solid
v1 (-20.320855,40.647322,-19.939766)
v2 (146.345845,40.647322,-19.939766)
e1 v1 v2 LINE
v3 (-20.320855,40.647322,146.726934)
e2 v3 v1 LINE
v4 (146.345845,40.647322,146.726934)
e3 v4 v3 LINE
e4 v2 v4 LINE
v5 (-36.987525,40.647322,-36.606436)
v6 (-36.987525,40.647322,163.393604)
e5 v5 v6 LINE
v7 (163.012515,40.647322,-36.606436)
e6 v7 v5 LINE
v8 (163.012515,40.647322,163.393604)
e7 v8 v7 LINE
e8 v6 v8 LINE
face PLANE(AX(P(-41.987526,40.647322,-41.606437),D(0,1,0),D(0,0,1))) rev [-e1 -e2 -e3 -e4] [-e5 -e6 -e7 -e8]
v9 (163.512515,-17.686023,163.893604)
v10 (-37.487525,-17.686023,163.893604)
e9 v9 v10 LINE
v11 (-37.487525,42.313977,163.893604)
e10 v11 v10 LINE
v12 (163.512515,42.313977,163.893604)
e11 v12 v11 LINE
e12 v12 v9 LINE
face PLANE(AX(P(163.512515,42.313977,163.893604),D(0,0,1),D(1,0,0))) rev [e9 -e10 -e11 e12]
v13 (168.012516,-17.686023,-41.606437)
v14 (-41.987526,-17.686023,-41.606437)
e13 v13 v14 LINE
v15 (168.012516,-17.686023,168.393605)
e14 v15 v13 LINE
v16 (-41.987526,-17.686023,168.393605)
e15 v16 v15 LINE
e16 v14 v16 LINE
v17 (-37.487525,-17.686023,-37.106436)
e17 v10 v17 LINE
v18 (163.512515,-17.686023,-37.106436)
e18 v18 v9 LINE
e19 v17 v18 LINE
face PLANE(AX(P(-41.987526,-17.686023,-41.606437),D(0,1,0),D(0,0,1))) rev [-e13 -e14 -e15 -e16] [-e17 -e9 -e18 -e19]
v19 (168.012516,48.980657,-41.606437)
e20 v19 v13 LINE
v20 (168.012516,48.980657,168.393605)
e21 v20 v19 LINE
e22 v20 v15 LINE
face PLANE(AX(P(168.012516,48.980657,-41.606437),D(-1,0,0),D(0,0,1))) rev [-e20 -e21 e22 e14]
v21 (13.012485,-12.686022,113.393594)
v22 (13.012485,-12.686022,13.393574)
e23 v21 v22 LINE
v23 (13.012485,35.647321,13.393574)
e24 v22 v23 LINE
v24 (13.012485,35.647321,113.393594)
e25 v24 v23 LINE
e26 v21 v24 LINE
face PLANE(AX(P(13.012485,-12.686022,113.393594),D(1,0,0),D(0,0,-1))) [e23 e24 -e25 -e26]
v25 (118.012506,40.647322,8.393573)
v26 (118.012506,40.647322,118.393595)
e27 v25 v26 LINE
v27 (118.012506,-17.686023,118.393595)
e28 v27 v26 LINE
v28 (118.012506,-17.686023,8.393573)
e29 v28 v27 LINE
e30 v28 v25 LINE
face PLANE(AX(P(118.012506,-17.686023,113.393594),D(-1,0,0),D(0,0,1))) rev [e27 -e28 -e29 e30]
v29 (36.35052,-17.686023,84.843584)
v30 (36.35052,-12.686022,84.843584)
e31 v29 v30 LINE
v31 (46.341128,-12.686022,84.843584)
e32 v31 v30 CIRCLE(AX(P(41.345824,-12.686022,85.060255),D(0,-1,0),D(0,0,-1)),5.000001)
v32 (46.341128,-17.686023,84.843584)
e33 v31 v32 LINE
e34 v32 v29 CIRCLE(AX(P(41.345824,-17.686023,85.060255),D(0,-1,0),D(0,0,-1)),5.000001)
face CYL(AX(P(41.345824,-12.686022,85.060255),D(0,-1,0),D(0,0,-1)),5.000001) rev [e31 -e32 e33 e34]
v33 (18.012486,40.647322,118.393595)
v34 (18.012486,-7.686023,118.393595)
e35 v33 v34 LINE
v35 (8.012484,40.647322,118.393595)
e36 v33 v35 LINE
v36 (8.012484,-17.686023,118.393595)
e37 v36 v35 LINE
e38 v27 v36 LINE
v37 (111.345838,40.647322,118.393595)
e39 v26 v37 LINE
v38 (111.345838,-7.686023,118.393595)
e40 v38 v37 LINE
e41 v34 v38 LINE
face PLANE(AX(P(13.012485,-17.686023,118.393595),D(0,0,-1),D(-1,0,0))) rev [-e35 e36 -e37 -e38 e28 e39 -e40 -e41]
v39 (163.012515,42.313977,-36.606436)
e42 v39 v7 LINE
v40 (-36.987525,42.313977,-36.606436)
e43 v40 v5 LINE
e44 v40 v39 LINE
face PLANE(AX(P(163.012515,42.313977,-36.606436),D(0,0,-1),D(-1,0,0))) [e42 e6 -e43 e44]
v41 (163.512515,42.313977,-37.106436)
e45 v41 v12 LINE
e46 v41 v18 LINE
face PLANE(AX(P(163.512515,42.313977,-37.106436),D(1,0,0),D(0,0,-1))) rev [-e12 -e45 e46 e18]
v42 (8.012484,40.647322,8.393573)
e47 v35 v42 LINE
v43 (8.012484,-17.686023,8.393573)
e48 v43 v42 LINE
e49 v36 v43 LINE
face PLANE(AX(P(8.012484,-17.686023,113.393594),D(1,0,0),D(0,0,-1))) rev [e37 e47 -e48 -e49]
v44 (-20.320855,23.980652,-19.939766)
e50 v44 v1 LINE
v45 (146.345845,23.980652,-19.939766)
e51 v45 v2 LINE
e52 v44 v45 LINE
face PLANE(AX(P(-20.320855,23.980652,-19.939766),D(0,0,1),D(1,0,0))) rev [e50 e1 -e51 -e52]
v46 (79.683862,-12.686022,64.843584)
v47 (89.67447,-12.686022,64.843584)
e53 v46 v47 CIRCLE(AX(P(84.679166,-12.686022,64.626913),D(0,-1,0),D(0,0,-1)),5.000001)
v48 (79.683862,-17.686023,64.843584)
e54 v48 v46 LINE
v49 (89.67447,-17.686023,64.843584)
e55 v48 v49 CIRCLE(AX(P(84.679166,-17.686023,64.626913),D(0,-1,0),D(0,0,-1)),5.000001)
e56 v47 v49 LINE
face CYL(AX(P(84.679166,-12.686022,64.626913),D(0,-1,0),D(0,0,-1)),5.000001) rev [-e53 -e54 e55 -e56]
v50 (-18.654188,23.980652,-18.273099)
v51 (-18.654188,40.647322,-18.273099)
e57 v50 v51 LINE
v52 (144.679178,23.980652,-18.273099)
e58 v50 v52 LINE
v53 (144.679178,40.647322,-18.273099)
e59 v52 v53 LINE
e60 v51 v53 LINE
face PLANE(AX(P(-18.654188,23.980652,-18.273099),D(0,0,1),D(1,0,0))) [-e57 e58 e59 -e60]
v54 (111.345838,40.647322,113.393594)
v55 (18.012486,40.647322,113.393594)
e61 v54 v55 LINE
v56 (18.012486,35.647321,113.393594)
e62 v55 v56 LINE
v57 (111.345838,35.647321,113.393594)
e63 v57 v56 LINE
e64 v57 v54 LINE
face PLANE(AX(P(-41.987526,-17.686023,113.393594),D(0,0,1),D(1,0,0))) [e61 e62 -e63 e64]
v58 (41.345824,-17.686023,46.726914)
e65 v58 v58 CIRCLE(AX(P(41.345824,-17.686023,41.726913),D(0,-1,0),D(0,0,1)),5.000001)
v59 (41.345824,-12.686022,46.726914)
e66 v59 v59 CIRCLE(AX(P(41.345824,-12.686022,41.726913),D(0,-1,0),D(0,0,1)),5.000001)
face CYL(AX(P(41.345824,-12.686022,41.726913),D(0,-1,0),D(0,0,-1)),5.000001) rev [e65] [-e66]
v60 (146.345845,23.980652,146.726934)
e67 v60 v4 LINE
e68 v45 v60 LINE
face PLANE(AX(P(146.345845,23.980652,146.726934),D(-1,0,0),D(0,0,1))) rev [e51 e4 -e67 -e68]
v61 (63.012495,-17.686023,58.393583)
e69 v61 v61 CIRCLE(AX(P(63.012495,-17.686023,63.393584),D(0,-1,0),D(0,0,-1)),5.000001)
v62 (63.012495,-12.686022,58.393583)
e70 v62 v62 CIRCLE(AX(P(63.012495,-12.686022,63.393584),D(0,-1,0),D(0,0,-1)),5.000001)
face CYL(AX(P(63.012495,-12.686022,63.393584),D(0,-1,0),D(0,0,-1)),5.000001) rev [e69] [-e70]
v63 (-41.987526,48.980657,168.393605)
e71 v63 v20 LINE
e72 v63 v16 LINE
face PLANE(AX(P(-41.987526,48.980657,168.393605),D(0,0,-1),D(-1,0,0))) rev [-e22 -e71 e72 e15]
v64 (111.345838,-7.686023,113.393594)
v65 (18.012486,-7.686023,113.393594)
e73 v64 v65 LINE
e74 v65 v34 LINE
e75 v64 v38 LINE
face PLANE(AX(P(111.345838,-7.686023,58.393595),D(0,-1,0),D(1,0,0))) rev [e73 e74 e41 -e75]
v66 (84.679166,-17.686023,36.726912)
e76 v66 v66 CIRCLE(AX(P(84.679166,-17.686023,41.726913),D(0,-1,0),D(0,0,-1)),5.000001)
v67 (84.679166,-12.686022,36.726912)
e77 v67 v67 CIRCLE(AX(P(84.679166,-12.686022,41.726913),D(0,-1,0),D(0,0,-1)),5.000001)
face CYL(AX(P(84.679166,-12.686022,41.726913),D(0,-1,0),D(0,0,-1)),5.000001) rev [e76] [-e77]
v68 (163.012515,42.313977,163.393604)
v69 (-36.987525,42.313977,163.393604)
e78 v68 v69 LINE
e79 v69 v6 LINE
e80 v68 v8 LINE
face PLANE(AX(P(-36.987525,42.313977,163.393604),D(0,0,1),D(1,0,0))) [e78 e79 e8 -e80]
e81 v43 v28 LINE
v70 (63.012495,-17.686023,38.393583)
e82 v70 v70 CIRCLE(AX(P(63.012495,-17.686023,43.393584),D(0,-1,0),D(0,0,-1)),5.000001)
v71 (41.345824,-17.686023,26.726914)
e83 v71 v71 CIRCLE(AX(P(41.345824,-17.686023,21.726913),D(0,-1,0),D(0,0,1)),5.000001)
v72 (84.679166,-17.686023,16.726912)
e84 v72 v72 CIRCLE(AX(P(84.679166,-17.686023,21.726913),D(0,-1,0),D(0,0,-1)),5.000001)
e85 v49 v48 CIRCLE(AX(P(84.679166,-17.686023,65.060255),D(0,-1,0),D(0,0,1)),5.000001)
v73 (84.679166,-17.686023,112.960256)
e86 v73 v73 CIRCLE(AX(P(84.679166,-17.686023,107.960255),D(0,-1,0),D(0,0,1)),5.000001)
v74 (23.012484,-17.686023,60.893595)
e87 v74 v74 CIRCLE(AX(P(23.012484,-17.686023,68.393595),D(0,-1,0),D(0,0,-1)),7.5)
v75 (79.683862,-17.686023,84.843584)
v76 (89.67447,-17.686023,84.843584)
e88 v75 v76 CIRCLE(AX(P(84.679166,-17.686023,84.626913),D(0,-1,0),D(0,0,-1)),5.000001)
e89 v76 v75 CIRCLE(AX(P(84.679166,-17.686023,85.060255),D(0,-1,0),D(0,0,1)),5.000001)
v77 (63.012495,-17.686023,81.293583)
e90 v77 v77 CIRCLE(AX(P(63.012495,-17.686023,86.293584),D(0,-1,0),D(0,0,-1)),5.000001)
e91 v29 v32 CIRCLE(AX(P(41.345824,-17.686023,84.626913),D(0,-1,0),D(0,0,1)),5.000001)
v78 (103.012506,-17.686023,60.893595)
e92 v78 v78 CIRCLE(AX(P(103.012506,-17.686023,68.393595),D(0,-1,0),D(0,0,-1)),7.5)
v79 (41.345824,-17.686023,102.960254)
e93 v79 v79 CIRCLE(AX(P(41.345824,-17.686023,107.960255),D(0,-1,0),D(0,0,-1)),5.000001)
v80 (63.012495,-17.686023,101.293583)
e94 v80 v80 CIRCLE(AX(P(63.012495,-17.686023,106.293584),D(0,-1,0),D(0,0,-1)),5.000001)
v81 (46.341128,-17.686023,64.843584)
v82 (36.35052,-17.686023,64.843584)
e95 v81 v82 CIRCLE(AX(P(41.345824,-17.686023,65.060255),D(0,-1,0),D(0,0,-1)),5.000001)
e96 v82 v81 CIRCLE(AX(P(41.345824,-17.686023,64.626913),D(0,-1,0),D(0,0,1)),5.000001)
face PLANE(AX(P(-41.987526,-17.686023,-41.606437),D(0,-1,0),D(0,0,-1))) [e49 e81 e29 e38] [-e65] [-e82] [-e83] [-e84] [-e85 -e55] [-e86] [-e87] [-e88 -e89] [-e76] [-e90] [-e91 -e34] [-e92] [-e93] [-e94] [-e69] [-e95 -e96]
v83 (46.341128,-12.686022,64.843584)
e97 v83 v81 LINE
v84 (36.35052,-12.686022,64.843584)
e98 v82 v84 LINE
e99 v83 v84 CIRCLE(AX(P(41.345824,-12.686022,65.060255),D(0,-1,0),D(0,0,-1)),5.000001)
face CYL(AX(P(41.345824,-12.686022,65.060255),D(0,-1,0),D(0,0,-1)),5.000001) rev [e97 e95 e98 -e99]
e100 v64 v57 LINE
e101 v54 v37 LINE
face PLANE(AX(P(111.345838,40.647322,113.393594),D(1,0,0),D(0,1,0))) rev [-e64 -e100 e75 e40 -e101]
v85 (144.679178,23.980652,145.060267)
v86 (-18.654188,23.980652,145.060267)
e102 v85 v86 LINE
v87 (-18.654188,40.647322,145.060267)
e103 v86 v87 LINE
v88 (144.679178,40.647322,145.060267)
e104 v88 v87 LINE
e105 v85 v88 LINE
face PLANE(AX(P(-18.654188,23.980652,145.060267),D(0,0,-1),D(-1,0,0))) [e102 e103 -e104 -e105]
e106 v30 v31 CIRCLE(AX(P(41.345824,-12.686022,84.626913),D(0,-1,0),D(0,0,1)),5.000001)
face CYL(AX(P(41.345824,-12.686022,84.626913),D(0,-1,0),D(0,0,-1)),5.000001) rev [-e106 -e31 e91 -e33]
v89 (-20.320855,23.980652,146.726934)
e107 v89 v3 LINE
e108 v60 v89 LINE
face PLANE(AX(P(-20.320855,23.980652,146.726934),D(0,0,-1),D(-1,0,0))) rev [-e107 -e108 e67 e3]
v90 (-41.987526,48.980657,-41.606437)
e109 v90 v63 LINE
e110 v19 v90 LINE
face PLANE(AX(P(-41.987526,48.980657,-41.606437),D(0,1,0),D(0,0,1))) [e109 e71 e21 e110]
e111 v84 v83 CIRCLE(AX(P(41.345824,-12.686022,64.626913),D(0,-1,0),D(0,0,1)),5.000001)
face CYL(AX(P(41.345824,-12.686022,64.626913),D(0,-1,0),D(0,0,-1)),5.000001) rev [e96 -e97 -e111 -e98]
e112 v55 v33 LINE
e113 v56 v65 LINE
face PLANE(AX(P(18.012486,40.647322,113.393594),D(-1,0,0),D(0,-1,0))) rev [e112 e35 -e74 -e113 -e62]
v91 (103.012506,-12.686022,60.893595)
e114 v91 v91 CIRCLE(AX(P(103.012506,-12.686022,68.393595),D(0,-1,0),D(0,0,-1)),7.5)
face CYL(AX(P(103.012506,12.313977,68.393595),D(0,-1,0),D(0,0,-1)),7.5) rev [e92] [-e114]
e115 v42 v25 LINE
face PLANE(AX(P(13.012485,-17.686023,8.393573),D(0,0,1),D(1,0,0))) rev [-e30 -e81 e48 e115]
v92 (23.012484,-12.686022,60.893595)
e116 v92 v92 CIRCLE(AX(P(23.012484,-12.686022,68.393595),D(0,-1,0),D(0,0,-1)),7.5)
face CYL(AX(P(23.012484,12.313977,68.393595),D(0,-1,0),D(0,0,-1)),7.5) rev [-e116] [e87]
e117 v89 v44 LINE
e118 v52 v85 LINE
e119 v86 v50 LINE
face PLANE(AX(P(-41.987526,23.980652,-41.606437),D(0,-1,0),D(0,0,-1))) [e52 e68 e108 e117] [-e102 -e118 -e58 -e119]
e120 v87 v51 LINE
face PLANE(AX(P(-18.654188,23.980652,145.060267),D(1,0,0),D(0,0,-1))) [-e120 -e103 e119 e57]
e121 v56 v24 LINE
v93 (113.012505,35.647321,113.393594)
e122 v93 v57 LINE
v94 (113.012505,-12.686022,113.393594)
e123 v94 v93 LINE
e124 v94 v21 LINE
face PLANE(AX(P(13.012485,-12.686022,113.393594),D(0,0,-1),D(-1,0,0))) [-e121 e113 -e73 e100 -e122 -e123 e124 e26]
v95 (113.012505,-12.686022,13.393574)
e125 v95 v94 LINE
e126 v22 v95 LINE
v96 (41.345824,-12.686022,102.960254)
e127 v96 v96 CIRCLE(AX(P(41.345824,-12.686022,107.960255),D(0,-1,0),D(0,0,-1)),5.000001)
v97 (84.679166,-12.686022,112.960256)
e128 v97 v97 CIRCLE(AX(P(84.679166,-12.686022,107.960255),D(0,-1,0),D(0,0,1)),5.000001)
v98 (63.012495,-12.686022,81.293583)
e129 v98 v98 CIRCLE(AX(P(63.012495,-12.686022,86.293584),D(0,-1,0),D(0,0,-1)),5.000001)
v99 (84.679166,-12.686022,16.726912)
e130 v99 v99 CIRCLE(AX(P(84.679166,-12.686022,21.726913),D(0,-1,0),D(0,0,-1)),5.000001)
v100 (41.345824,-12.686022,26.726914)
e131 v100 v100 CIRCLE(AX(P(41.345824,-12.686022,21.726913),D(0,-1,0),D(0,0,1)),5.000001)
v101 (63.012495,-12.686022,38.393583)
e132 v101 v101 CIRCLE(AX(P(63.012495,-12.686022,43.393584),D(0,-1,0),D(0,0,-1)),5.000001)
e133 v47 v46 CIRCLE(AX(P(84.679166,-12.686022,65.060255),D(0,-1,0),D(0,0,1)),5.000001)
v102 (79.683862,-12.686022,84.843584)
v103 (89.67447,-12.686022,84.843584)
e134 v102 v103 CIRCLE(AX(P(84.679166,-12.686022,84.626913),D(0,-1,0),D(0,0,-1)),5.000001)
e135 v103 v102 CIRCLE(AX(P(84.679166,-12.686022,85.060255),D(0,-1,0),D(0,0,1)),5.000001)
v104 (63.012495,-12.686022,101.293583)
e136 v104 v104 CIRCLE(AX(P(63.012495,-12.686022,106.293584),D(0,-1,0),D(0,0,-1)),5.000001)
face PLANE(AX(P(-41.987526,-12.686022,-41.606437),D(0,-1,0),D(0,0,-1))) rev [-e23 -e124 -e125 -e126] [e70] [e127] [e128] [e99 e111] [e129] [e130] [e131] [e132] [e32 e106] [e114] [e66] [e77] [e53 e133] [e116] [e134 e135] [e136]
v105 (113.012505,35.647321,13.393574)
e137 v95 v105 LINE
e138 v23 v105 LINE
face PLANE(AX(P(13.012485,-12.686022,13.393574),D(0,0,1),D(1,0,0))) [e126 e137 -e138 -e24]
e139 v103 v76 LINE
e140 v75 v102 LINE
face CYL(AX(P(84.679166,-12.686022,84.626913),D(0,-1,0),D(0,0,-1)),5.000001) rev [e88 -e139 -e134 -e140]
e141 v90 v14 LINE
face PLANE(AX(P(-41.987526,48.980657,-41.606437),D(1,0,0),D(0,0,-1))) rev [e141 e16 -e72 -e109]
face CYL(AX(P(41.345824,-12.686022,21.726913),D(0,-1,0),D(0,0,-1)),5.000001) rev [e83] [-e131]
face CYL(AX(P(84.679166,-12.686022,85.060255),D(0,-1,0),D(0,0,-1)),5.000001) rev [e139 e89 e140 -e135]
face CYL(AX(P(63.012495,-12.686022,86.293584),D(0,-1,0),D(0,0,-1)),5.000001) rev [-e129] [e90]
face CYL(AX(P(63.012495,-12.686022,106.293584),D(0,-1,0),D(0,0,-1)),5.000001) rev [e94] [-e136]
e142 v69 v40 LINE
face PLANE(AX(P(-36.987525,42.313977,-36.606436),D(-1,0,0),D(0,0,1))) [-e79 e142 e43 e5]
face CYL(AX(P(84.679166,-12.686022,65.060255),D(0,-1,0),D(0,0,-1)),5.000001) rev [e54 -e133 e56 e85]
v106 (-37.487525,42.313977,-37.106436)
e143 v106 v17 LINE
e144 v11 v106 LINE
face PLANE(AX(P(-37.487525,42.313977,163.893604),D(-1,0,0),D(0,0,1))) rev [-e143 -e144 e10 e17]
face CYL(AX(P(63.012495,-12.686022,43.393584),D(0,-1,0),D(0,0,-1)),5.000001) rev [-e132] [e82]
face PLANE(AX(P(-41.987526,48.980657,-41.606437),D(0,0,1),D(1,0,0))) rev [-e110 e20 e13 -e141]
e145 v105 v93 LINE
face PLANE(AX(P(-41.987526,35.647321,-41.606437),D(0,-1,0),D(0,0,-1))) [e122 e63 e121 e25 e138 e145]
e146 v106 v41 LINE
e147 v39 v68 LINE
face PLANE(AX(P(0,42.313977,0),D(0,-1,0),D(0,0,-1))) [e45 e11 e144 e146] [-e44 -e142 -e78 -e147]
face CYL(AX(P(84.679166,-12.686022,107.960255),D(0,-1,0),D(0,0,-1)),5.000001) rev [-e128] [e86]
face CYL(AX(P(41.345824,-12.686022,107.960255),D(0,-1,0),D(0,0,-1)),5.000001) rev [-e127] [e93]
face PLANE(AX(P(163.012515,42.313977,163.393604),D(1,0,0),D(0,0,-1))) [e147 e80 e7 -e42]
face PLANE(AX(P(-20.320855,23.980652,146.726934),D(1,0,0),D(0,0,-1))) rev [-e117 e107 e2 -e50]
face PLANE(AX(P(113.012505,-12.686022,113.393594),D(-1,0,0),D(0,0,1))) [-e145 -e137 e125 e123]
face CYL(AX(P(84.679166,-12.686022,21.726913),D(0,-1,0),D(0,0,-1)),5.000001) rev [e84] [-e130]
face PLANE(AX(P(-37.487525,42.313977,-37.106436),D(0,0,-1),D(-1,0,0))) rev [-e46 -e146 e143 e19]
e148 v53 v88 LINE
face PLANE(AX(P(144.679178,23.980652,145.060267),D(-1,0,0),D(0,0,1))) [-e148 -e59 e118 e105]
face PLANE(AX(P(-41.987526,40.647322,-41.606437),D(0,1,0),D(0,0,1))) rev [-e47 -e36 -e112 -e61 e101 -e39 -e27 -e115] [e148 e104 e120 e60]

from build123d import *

# Parameters (mm, degrees)
SKETCH_1_W                 = 126
SKETCH_1_H                 = 126
EXTRUDE_2_DEPTH            = 40
SKETCH_7_W                 = 120
SKETCH_7_H                 = 120
CUT_EXTRUDE_1_DEPTH        = 35
EXTRUDE_3_OUTLINE_W        = 66
EXTRUDE_3_OUTLINE_H        = 66
EXTRUDE_3_OUTLINE_W_2      = 60
EXTRUDE_3_OUTLINE_H_2      = 60
EXTRUDE_3_DEPTH            = 35
EXTRUDE_3_2_OUTLINE_W      = 60
EXTRUDE_3_2_OUTLINE_H      = 60
EXTRUDE_3_2_DEPTH          = 3
EXTRUDE_START              = 32
EXTRUDE_3_3_OUTLINE_W      = 60
EXTRUDE_3_3_OUTLINE_H      = 60
EXTRUDE_3_3_DEPTH          = 3
SKETCH_9_W                 = 56
SKETCH_9_H                 = 20
CUT_EXTRUDE_2_DEPTH        = 3
SKETCH_10_W                = 100
SKETCH_10_H                = 100
SKETCH_10_W_2              = 98
SKETCH_10_H_2              = 98
EXTRUDE_3_4_DEPTH          = 10
SKETCH_11_R                = 3
CUT_EXTRUDE_3_DEPTH        = 3
SCALE_1_SCALE              = 1.666667
SKETCH_13_W                = 201.00004
SKETCH_13_H                = 201.00004
SKETCH_13_W_2              = 200.00004
SKETCH_13_H_2              = 200.00004
CUT_EXTRUDE_4_DEPTH        = 60
SKETCH_14_W                = 93.333352
SKETCH_14_H                = 15.000005
CUT_EXTRUDE_5_DEPTH        = 60
PATTERN_START              = -17.686023251
PATTERN_LINEAR_2_OUTLINE_R = 5.000001
PATTERN_LINEAR_2_DEPTH     = 5.000001
PATTERN_LINEAR_3_OUTLINE_R = 5.000001
PATTERN_LINEAR_3_DEPTH     = 5.000001
SKETCH_15_R                = 7.5
CUT_EXTRUDE_6_DEPTH        = 30


# Read off the part's stored shape, not the designer's step: 拉伸-薄壁3, 阵列(线性)2, 阵列(线性)3
with BuildPart() as part:
    # 草图1 → 凸台-拉伸2 (new body)
    with BuildSketch(Plane(origin=(0, 0, 0), x_dir=(1, 0, 0), z_dir=(0, 1, 0))):
        with Locations((63, -63)):
            Rectangle(SKETCH_1_W, SKETCH_1_H)
    extrude(amount=EXTRUDE_2_DEPTH)

    # 草图7 → 切除-拉伸1 (cut)
    with BuildSketch(Plane(origin=(0, 0, 0), x_dir=(1, 0, 0), z_dir=(0, 1, 0))):
        with Locations((63, -63)):
            Rectangle(SKETCH_7_W, SKETCH_7_H)
    extrude(amount=CUT_EXTRUDE_1_DEPTH, mode=Mode.SUBTRACT)

    # Extrude 3 outline → Extrude 3 (add)
    with BuildSketch(Plane.XZ.offset(-35)):
        with Locations((63, 63)):
            Rectangle(EXTRUDE_3_OUTLINE_W, EXTRUDE_3_OUTLINE_H)
        with Locations((63, 63)):
            Rectangle(EXTRUDE_3_OUTLINE_W_2, EXTRUDE_3_OUTLINE_H_2, mode=Mode.SUBTRACT)
    extrude(amount=EXTRUDE_3_DEPTH)

    # Extrude 3 2 outline → Extrude 3 2 (add)
    with BuildSketch(Plane.XZ.offset(-35)):
        with Locations((63, 63)):
            Rectangle(EXTRUDE_3_2_OUTLINE_W, EXTRUDE_3_2_OUTLINE_H)
    extrude(amount=EXTRUDE_3_2_DEPTH)

    # Extrude 3 3 outline → Extrude 3 3 (add)
    with BuildSketch(Plane.XZ.offset(-35).offset(EXTRUDE_START)):
        with Locations((63, 63)):
            Rectangle(EXTRUDE_3_3_OUTLINE_W, EXTRUDE_3_3_OUTLINE_H)
    extrude(amount=EXTRUDE_3_3_DEPTH)

    # 草图9 → 切除-拉伸2 (cut)
    with BuildSketch(Plane.XY.offset(96)):
        with Locations((64, 25)):
            Rectangle(SKETCH_9_W, SKETCH_9_H)
    extrude(amount=-CUT_EXTRUDE_2_DEPTH, mode=Mode.SUBTRACT)

    # 草图10 → Extrude 3 4 (add)
    with BuildSketch(Plane.XZ.offset(-35)):
        with Locations((63, 63)):
            Rectangle(SKETCH_10_W, SKETCH_10_H)
        with Locations((63, 63)):
            Rectangle(SKETCH_10_W_2, SKETCH_10_H_2, mode=Mode.SUBTRACT)
    extrude(amount=EXTRUDE_3_4_DEPTH)

    # 草图11 → 切除-拉伸3 (cut)
    with BuildSketch(Plane.XZ):
        with Locations(Location((50, 76, 0), (0, 0, 270))):
            Circle(SKETCH_11_R)
        with Locations(Location((76, 76, 0), (0, 0, 90))):
            Circle(SKETCH_11_R)
        with Locations(Location((76, 50, 0), (0, 0, 270))):
            Circle(SKETCH_11_R)
        with Locations(Location((50, 50, 0), (0, 0, 90))):
            Circle(SKETCH_11_R)
        with Locations(Location((63, 63, 0), (0, 0, 270))):
            Circle(SKETCH_11_R)
    extrude(amount=-CUT_EXTRUDE_3_DEPTH, mode=Mode.SUBTRACT)


with BuildPart() as part_1:
    # 缩放比例1: scaled about (62.981257937, 26.529021612, 62.409625003)
    add(part.part.scale(SCALE_1_SCALE).moved(Location((-41.987526285, -17.686023251, -41.606437472))))

    # 草图13 → 切除-拉伸4 (cut)
    with BuildSketch(Plane.XZ.offset(17.686023251)):
        with Locations((63.012494715, 63.393583528)):
            Rectangle(SKETCH_13_W, SKETCH_13_H)
        with Locations((63.012494715, 63.393583528)):
            Rectangle(SKETCH_13_W_2, SKETCH_13_H_2, mode=Mode.SUBTRACT)
    extrude(amount=-CUT_EXTRUDE_4_DEPTH, mode=Mode.SUBTRACT)

    # 草图14 → 切除-拉伸5 (cut)
    with BuildSketch(Plane.XY.offset(118.393594528)):
        with Locations((64.679161715, -0.186020751)):
            Rectangle(SKETCH_14_W, SKETCH_14_H)
    extrude(amount=-CUT_EXTRUDE_5_DEPTH, mode=Mode.SUBTRACT)

    # 阵列(线性)2 outline → 阵列(线性)2 (cut)
    with BuildSketch(Plane(origin=(0, 0, 0), x_dir=(1, 0, 0), z_dir=(0, 1, 0)).offset(PATTERN_START)):
        with Locations((63.012494715, -43.393583528)):
            Circle(PATTERN_LINEAR_2_OUTLINE_R)
        with Locations((41.345823715, -65.060254528)):
            Circle(PATTERN_LINEAR_2_OUTLINE_R)
        with Locations((84.679165715, -65.060254528)):
            Circle(PATTERN_LINEAR_2_OUTLINE_R)
        with Locations((84.679165715, -21.726912528)):
            Circle(PATTERN_LINEAR_2_OUTLINE_R)
        with Locations((41.345823715, -21.726912528)):
            Circle(PATTERN_LINEAR_2_OUTLINE_R)
    extrude(amount=PATTERN_LINEAR_2_DEPTH, mode=Mode.SUBTRACT)

    # 阵列(线性)3 outline → 阵列(线性)3 (cut)
    with BuildSketch(Plane(origin=(0, 0, 0), x_dir=(1, 0, 0), z_dir=(0, 1, 0)).offset(PATTERN_START)):
        with Locations((63.012494715, -86.293583528)):
            Circle(PATTERN_LINEAR_3_OUTLINE_R)
        with Locations((63.012494715, -106.293583528)):
            Circle(PATTERN_LINEAR_3_OUTLINE_R)
        with Locations((41.345823715, -107.960254528)):
            Circle(PATTERN_LINEAR_3_OUTLINE_R)
        with Locations((84.679165715, -107.960254528)):
            Circle(PATTERN_LINEAR_3_OUTLINE_R)
        with BuildLine():
            ThreePointArc((89.674469878, -64.843583528), (84.679165715, -59.626911528), (79.683861552, -64.843583528))
            ThreePointArc((79.683861552, -64.843583528), (84.679165715, -60.060253528), (89.674469878, -64.843583528))
        make_face()
        with BuildLine():
            ThreePointArc((89.674469878, -84.843583528), (84.679165715, -79.626911528), (79.683861552, -84.843583528))
            ThreePointArc((79.683861552, -84.843583528), (84.679165715, -80.060253528), (89.674469878, -84.843583528))
        make_face()
        with BuildLine():
            ThreePointArc((46.341127878, -64.843583528), (41.345823715, -59.626911528), (36.350519552, -64.843583528))
            ThreePointArc((36.350519552, -64.843583528), (41.345823715, -60.060253528), (46.341127878, -64.843583528))
        make_face()
        with BuildLine():
            ThreePointArc((46.341127878, -84.843583528), (41.345823715, -79.626911528), (36.350519552, -84.843583528))
            ThreePointArc((36.350519552, -84.843583528), (41.345823715, -80.060253528), (46.341127878, -84.843583528))
        make_face()
    extrude(amount=PATTERN_LINEAR_3_DEPTH, mode=Mode.SUBTRACT)

    # 草图15 → 切除-拉伸6 (cut)
    with BuildSketch(Plane.XZ.offset(17.686023251)):
        with Locations(Location((103.012505715, 68.393594528, 0), (0, 0, 270))):
            Circle(SKETCH_15_R)
        with Locations(Location((23.012483715, 68.393594528, 0), (0, 0, 270))):
            Circle(SKETCH_15_R)
    extrude(amount=-CUT_EXTRUDE_6_DEPTH, mode=Mode.SUBTRACT)


solid = part_1.part
